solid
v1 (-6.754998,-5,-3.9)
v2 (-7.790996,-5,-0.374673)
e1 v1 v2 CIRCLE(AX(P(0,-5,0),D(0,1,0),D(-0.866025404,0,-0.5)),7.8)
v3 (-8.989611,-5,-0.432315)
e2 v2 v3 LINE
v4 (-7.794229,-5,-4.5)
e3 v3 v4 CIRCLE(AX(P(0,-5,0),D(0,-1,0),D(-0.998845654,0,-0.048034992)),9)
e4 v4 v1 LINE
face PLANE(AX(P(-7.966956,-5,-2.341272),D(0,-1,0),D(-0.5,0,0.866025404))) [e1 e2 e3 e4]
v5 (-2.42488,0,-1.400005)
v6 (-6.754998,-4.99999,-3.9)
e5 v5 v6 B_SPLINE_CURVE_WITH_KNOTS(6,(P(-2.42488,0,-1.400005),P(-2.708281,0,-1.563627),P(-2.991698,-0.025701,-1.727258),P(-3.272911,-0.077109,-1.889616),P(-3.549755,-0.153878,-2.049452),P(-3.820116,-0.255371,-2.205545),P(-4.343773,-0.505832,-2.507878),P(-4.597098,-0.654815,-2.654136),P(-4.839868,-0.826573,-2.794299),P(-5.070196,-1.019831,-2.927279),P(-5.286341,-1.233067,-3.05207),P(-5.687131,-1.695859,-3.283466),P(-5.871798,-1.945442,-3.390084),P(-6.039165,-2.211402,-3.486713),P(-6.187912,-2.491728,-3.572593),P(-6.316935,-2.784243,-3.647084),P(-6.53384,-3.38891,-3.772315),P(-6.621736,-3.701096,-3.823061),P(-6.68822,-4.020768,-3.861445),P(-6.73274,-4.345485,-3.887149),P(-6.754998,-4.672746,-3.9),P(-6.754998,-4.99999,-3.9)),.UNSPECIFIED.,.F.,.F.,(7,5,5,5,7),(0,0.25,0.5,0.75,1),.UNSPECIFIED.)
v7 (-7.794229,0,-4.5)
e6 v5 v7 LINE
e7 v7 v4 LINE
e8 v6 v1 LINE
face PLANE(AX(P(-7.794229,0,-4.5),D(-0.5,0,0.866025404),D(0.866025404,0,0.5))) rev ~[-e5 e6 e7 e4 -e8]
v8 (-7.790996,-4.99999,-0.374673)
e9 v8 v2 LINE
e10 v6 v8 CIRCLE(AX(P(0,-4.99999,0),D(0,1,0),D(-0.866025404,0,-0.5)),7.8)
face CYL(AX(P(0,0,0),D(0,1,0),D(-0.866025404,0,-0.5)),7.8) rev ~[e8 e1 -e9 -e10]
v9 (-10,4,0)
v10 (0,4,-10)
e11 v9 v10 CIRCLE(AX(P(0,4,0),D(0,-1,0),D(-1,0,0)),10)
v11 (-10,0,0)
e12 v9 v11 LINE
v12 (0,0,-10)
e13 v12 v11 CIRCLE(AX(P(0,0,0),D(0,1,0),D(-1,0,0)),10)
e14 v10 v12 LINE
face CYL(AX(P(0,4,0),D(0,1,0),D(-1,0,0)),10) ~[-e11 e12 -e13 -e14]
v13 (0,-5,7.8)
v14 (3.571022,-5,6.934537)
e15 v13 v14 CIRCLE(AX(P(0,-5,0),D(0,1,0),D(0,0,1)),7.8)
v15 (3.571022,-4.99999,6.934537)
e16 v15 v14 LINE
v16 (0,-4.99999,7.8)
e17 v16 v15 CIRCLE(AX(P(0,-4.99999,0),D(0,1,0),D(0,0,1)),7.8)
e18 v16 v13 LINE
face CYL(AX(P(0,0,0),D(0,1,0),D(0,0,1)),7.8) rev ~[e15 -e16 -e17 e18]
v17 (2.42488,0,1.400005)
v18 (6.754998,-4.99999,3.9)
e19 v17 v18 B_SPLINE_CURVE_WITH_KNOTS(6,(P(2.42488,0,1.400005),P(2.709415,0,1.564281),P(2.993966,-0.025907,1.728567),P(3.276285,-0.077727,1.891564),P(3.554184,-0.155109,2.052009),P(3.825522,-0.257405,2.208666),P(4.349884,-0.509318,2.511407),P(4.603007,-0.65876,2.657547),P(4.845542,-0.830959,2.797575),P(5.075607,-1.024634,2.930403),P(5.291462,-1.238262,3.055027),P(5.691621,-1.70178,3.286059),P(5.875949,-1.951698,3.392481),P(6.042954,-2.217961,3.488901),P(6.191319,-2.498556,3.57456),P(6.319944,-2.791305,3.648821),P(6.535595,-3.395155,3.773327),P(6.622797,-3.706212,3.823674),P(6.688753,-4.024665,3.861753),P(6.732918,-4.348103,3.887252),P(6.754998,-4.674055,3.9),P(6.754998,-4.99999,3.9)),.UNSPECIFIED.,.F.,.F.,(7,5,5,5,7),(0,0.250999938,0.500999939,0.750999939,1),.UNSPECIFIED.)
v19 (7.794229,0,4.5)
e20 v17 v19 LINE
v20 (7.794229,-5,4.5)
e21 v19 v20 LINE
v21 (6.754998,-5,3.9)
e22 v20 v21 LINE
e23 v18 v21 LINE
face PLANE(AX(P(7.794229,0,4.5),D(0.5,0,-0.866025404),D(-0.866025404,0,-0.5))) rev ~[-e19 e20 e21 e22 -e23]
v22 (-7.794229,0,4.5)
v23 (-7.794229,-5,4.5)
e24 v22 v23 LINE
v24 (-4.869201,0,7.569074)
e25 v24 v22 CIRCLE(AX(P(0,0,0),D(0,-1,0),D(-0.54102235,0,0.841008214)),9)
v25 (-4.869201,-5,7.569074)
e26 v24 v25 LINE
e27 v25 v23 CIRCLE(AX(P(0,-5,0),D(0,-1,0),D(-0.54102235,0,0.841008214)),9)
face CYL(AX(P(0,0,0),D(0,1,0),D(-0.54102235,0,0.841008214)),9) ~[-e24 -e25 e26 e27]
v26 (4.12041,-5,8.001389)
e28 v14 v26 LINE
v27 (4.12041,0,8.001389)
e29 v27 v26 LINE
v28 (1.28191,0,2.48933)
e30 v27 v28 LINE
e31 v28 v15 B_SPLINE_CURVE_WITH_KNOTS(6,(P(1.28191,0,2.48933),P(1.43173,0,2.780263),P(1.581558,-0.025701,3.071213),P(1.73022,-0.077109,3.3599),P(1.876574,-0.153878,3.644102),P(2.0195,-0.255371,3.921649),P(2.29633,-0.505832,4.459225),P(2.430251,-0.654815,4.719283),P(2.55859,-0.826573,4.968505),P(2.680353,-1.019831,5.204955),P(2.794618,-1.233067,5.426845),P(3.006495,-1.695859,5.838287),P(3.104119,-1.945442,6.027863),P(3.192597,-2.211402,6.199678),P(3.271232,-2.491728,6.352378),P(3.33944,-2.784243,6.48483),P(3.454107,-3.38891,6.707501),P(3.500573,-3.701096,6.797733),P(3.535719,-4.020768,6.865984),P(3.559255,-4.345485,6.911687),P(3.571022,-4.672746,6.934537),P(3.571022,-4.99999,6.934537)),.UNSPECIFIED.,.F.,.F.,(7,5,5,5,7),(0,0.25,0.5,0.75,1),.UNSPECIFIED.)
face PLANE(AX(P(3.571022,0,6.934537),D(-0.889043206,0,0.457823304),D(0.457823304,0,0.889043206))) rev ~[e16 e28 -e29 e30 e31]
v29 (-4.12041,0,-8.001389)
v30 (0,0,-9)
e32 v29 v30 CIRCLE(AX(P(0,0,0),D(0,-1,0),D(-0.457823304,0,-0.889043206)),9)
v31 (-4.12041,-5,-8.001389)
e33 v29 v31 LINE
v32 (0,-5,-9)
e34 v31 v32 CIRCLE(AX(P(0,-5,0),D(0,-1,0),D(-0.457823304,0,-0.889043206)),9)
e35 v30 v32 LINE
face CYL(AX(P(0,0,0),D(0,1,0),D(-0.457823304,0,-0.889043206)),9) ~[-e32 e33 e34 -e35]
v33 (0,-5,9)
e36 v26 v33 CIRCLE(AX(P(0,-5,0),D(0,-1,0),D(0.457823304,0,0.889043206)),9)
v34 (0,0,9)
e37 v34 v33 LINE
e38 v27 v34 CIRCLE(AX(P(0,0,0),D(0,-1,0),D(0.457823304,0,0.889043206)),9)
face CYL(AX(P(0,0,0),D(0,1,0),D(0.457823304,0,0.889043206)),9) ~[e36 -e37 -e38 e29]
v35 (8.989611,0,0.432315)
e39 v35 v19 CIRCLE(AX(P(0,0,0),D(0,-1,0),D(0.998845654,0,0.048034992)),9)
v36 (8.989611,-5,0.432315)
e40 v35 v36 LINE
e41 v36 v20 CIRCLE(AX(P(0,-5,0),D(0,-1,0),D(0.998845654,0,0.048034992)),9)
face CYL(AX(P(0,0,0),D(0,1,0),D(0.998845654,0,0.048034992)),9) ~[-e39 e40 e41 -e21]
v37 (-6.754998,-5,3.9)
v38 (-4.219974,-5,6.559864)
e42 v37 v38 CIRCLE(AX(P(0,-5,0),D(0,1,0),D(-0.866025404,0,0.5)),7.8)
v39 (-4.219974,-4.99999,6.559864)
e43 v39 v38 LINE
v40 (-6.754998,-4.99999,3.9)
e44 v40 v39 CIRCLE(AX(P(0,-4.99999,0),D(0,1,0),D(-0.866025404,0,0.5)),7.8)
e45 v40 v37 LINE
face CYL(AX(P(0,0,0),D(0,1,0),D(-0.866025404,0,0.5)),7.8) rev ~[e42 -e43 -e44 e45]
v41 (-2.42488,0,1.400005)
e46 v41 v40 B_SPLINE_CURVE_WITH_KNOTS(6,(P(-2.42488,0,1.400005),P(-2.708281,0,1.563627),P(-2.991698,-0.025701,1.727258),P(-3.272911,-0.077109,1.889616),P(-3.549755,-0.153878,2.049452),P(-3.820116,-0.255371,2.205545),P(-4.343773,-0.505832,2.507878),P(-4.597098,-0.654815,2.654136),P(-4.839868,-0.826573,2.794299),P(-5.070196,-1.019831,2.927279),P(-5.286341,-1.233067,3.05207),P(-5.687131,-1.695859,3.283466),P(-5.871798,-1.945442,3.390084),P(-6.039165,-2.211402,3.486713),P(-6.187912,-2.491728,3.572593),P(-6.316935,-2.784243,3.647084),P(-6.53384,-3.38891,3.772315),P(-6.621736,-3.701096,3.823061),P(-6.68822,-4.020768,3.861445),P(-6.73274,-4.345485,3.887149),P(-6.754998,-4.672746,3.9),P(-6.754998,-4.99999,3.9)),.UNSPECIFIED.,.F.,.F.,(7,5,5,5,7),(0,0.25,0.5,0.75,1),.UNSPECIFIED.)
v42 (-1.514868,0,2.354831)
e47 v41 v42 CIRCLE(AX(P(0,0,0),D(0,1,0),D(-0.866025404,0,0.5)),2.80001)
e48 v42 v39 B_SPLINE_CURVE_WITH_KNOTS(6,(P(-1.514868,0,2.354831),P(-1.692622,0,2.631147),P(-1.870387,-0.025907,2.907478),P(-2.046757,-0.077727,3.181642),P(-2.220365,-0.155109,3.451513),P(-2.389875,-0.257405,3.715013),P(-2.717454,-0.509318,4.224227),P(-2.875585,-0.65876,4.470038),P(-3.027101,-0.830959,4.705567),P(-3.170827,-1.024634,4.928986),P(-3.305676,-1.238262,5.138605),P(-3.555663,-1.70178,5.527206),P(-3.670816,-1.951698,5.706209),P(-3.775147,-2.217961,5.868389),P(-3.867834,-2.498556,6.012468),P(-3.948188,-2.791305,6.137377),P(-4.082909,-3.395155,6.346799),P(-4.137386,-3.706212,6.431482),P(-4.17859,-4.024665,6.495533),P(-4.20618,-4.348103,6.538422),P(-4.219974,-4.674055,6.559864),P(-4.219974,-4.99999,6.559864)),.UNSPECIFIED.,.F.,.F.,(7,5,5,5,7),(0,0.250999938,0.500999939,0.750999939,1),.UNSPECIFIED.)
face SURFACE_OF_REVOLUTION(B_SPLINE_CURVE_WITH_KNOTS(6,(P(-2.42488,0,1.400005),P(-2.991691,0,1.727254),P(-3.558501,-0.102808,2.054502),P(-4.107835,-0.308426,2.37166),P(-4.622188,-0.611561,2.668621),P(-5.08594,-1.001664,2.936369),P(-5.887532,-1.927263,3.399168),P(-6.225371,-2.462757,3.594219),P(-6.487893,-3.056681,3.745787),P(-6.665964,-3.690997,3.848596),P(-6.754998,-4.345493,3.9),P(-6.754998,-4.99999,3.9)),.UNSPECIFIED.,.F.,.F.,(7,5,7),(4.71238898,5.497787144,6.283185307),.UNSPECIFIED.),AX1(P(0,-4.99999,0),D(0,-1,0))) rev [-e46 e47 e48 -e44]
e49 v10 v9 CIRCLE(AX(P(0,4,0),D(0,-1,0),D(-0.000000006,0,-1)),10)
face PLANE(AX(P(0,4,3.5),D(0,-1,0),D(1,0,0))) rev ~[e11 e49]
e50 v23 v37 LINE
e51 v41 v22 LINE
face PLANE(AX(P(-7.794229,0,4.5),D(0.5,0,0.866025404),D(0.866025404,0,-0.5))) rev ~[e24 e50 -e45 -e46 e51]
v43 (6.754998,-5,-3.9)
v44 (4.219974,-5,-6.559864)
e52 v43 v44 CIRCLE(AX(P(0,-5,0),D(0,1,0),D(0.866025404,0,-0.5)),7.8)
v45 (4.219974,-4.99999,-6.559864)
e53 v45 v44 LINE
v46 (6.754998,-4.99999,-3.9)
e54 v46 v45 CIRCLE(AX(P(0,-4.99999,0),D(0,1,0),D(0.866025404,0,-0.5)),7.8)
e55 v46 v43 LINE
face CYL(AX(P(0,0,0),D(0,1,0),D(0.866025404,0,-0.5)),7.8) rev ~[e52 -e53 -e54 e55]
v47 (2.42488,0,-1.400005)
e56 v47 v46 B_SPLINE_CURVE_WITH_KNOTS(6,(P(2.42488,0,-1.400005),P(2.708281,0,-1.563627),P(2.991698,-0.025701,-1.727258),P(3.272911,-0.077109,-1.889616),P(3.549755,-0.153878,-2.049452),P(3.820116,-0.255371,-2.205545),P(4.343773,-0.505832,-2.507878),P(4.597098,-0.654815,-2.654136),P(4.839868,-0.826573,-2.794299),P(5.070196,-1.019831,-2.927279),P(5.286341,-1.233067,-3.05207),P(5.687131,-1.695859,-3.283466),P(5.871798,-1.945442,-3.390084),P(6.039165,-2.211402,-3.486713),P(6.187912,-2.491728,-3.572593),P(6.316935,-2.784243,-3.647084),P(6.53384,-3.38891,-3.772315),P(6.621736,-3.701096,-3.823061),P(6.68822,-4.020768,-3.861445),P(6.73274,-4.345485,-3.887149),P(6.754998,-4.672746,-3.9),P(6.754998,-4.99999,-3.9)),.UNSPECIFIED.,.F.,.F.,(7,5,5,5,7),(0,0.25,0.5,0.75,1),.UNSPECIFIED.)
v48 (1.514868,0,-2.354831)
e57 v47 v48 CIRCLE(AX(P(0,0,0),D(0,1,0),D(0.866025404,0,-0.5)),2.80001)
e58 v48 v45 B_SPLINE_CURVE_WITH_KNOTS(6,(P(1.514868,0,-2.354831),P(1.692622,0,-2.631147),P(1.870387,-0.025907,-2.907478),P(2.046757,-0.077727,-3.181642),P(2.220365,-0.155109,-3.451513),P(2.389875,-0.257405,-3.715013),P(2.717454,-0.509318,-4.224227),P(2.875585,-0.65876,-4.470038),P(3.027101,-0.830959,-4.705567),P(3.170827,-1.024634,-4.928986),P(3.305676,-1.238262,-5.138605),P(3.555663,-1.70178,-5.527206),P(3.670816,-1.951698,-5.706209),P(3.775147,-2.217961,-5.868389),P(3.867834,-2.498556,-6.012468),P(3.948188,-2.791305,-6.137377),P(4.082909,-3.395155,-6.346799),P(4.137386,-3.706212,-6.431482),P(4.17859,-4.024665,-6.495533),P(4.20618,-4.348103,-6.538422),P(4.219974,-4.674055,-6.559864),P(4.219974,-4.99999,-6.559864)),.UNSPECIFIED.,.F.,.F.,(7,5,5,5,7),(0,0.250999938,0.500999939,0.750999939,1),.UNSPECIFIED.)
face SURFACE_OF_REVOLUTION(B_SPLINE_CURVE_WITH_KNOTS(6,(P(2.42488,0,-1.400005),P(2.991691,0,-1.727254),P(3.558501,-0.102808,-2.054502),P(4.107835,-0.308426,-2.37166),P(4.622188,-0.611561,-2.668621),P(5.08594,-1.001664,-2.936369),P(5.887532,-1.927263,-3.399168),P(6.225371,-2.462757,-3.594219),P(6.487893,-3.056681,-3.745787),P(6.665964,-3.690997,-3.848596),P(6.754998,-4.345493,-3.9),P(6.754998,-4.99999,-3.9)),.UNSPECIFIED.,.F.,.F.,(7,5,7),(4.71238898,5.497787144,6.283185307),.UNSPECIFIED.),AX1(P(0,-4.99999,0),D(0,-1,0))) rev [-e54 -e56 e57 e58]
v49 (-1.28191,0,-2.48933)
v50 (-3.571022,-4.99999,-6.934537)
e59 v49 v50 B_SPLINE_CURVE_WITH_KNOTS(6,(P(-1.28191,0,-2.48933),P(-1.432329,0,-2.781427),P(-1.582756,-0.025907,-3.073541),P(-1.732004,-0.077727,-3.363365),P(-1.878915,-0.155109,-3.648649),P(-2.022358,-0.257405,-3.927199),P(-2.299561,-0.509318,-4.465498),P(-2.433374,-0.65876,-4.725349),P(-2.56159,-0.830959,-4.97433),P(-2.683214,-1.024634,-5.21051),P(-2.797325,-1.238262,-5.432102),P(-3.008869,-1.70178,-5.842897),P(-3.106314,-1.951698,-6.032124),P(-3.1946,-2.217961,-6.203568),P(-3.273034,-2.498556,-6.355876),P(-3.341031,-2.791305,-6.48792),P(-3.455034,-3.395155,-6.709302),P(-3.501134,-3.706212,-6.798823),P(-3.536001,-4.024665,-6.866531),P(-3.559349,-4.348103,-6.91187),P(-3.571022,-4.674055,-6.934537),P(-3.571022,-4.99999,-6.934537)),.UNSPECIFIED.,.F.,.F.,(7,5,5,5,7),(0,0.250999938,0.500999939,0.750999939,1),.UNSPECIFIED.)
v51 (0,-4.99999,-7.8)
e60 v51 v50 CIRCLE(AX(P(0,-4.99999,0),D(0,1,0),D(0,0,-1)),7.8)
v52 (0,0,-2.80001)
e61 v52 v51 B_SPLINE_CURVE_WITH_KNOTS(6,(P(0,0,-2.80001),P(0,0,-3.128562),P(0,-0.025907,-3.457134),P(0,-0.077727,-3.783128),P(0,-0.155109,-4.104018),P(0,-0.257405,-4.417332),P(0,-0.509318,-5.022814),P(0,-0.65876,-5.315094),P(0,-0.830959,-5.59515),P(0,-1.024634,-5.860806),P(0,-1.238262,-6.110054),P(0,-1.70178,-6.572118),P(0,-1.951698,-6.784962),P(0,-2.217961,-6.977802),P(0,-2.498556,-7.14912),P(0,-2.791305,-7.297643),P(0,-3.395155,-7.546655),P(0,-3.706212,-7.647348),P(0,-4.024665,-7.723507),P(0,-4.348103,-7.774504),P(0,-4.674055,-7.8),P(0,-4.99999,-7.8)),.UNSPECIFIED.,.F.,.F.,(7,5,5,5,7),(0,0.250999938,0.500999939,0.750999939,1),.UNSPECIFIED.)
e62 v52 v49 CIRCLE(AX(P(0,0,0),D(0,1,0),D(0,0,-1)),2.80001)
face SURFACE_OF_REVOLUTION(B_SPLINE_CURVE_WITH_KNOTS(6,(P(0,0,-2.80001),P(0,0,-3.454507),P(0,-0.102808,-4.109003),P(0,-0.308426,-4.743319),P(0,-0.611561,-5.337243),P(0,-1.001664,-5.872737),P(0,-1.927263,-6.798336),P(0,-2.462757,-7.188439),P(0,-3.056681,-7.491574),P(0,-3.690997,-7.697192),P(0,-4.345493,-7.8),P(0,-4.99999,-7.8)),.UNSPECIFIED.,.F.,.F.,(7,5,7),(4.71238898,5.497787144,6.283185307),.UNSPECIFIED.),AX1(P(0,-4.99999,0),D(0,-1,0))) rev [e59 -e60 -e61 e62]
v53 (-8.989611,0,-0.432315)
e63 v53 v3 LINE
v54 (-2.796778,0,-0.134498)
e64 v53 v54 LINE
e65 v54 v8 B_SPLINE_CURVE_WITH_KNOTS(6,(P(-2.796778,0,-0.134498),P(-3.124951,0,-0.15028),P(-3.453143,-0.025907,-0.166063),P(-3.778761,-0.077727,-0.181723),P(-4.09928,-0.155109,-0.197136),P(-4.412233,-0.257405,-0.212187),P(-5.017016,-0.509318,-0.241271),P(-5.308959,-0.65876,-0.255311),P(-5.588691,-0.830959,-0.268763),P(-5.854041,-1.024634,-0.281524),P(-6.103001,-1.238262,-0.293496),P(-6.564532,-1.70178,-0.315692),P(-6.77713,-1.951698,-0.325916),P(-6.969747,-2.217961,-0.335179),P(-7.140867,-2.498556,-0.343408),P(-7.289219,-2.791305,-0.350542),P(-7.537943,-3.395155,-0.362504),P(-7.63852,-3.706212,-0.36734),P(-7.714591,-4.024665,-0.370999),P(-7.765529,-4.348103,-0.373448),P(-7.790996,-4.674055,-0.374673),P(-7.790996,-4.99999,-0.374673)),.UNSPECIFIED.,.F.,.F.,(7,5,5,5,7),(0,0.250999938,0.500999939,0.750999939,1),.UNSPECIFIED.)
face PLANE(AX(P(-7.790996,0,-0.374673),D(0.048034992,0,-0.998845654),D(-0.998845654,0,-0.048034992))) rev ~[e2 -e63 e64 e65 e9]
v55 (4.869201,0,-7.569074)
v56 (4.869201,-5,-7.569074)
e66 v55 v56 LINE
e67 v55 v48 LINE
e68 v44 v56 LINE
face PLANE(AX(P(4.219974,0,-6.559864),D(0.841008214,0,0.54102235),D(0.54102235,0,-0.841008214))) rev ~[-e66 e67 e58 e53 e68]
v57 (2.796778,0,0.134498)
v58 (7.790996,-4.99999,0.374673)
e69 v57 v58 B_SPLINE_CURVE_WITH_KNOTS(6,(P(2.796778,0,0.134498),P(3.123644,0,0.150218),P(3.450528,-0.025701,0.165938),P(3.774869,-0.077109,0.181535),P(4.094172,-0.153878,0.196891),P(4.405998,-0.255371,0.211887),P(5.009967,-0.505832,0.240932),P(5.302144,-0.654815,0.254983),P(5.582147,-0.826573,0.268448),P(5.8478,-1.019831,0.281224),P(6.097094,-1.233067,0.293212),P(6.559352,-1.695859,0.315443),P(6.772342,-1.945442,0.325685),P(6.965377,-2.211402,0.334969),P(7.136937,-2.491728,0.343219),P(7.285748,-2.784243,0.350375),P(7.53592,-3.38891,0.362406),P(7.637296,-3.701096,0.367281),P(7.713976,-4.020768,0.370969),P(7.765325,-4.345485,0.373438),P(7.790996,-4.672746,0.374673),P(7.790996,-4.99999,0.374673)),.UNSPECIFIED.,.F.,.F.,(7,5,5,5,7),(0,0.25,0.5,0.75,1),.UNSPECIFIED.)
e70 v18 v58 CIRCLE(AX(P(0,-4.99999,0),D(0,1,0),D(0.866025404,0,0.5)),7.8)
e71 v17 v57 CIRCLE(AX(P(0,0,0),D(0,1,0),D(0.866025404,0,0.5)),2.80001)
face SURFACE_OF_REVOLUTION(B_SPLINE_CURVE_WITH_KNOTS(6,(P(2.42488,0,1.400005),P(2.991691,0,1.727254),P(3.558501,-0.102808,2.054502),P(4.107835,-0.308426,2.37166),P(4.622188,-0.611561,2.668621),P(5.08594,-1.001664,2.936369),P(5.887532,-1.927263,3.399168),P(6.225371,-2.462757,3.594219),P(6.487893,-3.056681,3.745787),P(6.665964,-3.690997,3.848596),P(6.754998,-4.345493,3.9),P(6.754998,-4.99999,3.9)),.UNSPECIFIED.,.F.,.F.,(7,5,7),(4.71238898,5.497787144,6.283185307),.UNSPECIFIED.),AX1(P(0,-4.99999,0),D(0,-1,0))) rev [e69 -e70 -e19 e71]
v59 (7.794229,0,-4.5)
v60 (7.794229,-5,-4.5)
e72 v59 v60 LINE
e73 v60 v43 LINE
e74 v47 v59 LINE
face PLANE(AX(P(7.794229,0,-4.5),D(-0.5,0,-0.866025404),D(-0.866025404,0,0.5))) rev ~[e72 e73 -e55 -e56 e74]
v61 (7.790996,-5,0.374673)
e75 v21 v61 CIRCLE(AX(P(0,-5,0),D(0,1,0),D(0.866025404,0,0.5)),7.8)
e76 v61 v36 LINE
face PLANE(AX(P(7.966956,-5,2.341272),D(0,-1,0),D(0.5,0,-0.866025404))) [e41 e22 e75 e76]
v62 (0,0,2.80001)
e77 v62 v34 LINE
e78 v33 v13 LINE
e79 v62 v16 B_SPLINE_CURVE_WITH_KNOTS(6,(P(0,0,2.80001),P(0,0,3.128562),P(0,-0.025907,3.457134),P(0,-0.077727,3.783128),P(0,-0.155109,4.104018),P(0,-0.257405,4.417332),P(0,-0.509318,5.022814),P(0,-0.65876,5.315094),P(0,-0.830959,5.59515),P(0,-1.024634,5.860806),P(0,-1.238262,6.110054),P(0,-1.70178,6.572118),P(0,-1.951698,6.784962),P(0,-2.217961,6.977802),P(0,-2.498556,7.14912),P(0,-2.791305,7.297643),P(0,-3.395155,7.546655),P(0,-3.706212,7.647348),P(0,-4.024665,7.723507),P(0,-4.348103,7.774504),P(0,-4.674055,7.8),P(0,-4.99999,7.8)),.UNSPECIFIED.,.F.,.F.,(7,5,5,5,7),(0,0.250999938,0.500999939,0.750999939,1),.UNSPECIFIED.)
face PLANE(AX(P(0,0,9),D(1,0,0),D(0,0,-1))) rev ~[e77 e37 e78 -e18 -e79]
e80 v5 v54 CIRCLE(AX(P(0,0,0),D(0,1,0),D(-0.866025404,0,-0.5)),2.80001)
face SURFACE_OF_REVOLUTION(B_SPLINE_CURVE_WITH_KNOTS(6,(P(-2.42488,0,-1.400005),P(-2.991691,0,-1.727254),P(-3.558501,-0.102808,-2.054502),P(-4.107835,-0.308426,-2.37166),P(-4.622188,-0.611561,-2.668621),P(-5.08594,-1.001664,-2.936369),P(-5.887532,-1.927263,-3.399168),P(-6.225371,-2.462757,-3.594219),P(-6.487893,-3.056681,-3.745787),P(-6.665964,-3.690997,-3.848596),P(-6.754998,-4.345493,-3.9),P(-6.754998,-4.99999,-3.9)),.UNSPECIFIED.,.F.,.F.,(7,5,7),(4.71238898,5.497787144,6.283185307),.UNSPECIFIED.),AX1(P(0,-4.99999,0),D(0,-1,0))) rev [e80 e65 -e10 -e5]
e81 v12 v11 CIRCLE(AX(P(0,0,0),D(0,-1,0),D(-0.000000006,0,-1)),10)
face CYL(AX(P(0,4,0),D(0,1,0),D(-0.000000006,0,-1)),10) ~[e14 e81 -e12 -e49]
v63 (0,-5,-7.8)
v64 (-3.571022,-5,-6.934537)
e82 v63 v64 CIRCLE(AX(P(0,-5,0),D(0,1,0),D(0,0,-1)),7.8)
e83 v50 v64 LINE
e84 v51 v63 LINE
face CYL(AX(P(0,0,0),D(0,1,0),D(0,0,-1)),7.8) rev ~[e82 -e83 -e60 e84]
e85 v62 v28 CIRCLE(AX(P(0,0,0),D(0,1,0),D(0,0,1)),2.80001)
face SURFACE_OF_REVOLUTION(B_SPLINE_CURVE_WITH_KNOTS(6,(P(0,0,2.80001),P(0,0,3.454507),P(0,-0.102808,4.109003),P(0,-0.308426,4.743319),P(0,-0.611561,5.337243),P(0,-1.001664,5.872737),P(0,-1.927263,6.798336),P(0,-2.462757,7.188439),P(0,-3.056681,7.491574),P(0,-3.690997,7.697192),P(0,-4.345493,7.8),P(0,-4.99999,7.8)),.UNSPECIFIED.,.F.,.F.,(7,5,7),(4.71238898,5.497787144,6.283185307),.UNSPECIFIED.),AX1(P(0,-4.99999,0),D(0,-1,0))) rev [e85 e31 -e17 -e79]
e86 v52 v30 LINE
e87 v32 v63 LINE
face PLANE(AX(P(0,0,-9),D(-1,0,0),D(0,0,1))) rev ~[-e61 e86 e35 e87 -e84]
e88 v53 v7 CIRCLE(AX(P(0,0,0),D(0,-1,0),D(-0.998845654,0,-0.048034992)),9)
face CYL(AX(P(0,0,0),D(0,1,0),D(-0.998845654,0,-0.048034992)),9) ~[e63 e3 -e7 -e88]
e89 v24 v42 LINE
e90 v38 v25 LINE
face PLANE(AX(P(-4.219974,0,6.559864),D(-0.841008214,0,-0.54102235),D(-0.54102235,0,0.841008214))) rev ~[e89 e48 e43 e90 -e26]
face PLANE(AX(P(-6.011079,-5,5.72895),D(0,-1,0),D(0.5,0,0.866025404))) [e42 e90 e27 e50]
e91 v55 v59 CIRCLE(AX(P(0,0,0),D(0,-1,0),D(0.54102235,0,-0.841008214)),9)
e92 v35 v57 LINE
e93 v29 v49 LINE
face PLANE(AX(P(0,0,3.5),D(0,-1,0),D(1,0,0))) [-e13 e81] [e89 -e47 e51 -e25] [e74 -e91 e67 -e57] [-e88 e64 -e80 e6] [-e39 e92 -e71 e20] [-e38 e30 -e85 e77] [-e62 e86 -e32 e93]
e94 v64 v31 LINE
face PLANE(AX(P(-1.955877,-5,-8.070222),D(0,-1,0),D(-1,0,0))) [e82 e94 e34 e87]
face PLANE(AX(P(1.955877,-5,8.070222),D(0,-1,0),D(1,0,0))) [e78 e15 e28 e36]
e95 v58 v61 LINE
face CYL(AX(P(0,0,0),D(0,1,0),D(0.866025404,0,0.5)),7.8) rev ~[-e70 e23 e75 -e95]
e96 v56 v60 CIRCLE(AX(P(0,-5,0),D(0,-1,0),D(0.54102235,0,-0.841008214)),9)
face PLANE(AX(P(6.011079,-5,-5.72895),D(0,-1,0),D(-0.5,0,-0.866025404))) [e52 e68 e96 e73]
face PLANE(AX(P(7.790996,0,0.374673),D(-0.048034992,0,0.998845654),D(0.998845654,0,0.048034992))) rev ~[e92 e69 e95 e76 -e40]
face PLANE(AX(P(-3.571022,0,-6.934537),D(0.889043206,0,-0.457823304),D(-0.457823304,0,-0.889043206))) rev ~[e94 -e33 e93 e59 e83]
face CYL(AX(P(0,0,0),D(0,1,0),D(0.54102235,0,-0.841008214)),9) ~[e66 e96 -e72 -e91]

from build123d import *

# Parameters (mm, degrees)
F2_DEPTH        = 5
F2_COPIES_COUNT = 6
F4_R            = 13.5
F5_DEPTH        = 4
F6_R            = 4.99999
F8_DEPTH        = 6
F10_DEPTH       = 1.5
F11_R           = 23.1793955011
F12_DEPTH       = 25


# Not quite as in the source:
# - a fillet or chamfer is up to 0.001 mm smaller than in the source, because OpenCascade refuses the exact size
# - a pattern or mirror of a feature is missing from the dataset's text; its kind, count and spacing are read off the source's solid


with BuildPart() as f2:
    # F1 (on Front) → F2 (new body)
    with BuildSketch(Plane.XZ):
        with BuildLine():
            Line((3.5710217678, 6.9345370094), (4.120409732, 8.001388857))
            ThreePointArc((4.120409732, 8.001388857), (2.1198467265, 8.7467851155), (0, 9))
            Line((0, 9), (0, 7.8))
            ThreePointArc((0, 7.8), (1.8372004963, 7.5805471001), (3.5710217678, 6.9345370094))
        make_face()
    extrude(amount=F2_DEPTH)


with BuildPart() as f2_copies_1:
    # F2_copies: instance of F2
    add(f2.part.rotate(Axis((0, 0, 0), (0, 1, 0)), 1 * 360 / F2_COPIES_COUNT))


with BuildPart() as f2_copies_2:
    # F2_copies: instance of F2
    add(f2.part.rotate(Axis((0, 0, 0), (0, 1, 0)), 2 * 360 / F2_COPIES_COUNT))


with BuildPart() as f2_copies_3:
    # F2_copies: instance of F2
    add(f2.part.rotate(Axis((0, 0, 0), (0, 1, 0)), 3 * 360 / F2_COPIES_COUNT))


with BuildPart() as f2_copies_4:
    # F2_copies: instance of F2
    add(f2.part.rotate(Axis((0, 0, 0), (0, 1, 0)), 4 * 360 / F2_COPIES_COUNT))


with BuildPart() as f2_copies_5:
    # F2_copies: instance of F2
    add(f2.part.rotate(Axis((0, 0, 0), (0, 1, 0)), 5 * 360 / F2_COPIES_COUNT))


with BuildPart() as f2_1:
    add(f2.part)

    add(f2_copies_1.part)  # F5 merges F2_copies_1

    add(f2_copies_2.part)  # F5 merges F2_copies_2

    add(f2_copies_3.part)  # F5 merges F2_copies_3

    add(f2_copies_4.part)  # F5 merges F2_copies_4

    add(f2_copies_5.part)  # F5 merges F2_copies_5
    # F4 (on Front) → F5 (join)
    with BuildSketch(Plane.XZ):
        with Locations((0, 3.5)):
            Circle(F4_R)
    extrude(amount=-F5_DEPTH)

    # F6 (radius 5 in the source; OpenCascade refuses exactly that, so slightly less here)
    f6_edges = [f2_1.edges().sort_by_distance(p)[0] for p in [
        (-1.8372, 0, -7.580547),
        (-7.483547, 0, -2.199211),
        (5.646346, 0, -5.381336),
        (-5.646346, 0, 5.381336),
        (7.483547, 0, 2.199211),
        (1.8372, 0, 7.580547),
    ]]
    fillet(f6_edges, radius=F6_R)

    # F7 (on face) → F8 (join)
    with BuildSketch(Plane.XZ):
        with BuildLine():
            ThreePointArc((-10, 0), (0, 10), (10, 0))
            Line((10, 0), (12, 0))
            ThreePointArc((12, 0), (0, 12), (-12, 0))
            Line((-12, 0), (-10, 0))
        make_face()
    extrude(amount=F8_DEPTH)

    # F9 (on face) → F10 (join)
    with BuildSketch(Plane.XZ.offset(6)):
        with BuildLine():
            Line((12, 0), (13.5, 0))
            ThreePointArc((13.5, 0), (0, 13.5), (-13.5, 0))
            Line((-13.5, 0), (-12, 0))
            ThreePointArc((-12, 0), (0, 12), (12, 0))
        make_face()
        with BuildLine():
            Line((10, 0), (12, 0))
            ThreePointArc((12, 0), (0, 12), (-12, 0))
            Line((-12, 0), (-10, 0))
            ThreePointArc((-10, 0), (0, 10), (10, 0))
        make_face()
    extrude(amount=F10_DEPTH)

    # F11 (on face) → F12 (cut)
    with BuildSketch(Plane(origin=(0, 4, 0), x_dir=(-1, 0, 0), z_dir=(0, 1, 0))):
        Circle(F11_R)
        with BuildLine():
            ThreePointArc((13.5, 3.5), (9.5459415677, -6.0459415243), (6.13e-08, -10))
            ThreePointArc((6.13e-08, -10), (-9.5459415677, 13.0459415243), (13.5, 3.5))
        make_face(mode=Mode.SUBTRACT)
        with BuildLine():
            ThreePointArc((13.5, 3.5), (-9.5459415677, 13.0459415243), (6.13e-08, -10))
            ThreePointArc((6.13e-08, -10), (9.5459415677, -6.0459415243), (13.5, 3.5))
        make_face()
        with BuildLine():
            ThreePointArc((6.13e-08, -10), (-7.0710678335, 7.0710677902), (10, 0))
            ThreePointArc((10, 0), (7.0710678335, -7.0710677902), (6.13e-08, -10))
        make_face(mode=Mode.SUBTRACT)
    extrude(amount=-F12_DEPTH, mode=Mode.SUBTRACT)


solid = f2_1.part
